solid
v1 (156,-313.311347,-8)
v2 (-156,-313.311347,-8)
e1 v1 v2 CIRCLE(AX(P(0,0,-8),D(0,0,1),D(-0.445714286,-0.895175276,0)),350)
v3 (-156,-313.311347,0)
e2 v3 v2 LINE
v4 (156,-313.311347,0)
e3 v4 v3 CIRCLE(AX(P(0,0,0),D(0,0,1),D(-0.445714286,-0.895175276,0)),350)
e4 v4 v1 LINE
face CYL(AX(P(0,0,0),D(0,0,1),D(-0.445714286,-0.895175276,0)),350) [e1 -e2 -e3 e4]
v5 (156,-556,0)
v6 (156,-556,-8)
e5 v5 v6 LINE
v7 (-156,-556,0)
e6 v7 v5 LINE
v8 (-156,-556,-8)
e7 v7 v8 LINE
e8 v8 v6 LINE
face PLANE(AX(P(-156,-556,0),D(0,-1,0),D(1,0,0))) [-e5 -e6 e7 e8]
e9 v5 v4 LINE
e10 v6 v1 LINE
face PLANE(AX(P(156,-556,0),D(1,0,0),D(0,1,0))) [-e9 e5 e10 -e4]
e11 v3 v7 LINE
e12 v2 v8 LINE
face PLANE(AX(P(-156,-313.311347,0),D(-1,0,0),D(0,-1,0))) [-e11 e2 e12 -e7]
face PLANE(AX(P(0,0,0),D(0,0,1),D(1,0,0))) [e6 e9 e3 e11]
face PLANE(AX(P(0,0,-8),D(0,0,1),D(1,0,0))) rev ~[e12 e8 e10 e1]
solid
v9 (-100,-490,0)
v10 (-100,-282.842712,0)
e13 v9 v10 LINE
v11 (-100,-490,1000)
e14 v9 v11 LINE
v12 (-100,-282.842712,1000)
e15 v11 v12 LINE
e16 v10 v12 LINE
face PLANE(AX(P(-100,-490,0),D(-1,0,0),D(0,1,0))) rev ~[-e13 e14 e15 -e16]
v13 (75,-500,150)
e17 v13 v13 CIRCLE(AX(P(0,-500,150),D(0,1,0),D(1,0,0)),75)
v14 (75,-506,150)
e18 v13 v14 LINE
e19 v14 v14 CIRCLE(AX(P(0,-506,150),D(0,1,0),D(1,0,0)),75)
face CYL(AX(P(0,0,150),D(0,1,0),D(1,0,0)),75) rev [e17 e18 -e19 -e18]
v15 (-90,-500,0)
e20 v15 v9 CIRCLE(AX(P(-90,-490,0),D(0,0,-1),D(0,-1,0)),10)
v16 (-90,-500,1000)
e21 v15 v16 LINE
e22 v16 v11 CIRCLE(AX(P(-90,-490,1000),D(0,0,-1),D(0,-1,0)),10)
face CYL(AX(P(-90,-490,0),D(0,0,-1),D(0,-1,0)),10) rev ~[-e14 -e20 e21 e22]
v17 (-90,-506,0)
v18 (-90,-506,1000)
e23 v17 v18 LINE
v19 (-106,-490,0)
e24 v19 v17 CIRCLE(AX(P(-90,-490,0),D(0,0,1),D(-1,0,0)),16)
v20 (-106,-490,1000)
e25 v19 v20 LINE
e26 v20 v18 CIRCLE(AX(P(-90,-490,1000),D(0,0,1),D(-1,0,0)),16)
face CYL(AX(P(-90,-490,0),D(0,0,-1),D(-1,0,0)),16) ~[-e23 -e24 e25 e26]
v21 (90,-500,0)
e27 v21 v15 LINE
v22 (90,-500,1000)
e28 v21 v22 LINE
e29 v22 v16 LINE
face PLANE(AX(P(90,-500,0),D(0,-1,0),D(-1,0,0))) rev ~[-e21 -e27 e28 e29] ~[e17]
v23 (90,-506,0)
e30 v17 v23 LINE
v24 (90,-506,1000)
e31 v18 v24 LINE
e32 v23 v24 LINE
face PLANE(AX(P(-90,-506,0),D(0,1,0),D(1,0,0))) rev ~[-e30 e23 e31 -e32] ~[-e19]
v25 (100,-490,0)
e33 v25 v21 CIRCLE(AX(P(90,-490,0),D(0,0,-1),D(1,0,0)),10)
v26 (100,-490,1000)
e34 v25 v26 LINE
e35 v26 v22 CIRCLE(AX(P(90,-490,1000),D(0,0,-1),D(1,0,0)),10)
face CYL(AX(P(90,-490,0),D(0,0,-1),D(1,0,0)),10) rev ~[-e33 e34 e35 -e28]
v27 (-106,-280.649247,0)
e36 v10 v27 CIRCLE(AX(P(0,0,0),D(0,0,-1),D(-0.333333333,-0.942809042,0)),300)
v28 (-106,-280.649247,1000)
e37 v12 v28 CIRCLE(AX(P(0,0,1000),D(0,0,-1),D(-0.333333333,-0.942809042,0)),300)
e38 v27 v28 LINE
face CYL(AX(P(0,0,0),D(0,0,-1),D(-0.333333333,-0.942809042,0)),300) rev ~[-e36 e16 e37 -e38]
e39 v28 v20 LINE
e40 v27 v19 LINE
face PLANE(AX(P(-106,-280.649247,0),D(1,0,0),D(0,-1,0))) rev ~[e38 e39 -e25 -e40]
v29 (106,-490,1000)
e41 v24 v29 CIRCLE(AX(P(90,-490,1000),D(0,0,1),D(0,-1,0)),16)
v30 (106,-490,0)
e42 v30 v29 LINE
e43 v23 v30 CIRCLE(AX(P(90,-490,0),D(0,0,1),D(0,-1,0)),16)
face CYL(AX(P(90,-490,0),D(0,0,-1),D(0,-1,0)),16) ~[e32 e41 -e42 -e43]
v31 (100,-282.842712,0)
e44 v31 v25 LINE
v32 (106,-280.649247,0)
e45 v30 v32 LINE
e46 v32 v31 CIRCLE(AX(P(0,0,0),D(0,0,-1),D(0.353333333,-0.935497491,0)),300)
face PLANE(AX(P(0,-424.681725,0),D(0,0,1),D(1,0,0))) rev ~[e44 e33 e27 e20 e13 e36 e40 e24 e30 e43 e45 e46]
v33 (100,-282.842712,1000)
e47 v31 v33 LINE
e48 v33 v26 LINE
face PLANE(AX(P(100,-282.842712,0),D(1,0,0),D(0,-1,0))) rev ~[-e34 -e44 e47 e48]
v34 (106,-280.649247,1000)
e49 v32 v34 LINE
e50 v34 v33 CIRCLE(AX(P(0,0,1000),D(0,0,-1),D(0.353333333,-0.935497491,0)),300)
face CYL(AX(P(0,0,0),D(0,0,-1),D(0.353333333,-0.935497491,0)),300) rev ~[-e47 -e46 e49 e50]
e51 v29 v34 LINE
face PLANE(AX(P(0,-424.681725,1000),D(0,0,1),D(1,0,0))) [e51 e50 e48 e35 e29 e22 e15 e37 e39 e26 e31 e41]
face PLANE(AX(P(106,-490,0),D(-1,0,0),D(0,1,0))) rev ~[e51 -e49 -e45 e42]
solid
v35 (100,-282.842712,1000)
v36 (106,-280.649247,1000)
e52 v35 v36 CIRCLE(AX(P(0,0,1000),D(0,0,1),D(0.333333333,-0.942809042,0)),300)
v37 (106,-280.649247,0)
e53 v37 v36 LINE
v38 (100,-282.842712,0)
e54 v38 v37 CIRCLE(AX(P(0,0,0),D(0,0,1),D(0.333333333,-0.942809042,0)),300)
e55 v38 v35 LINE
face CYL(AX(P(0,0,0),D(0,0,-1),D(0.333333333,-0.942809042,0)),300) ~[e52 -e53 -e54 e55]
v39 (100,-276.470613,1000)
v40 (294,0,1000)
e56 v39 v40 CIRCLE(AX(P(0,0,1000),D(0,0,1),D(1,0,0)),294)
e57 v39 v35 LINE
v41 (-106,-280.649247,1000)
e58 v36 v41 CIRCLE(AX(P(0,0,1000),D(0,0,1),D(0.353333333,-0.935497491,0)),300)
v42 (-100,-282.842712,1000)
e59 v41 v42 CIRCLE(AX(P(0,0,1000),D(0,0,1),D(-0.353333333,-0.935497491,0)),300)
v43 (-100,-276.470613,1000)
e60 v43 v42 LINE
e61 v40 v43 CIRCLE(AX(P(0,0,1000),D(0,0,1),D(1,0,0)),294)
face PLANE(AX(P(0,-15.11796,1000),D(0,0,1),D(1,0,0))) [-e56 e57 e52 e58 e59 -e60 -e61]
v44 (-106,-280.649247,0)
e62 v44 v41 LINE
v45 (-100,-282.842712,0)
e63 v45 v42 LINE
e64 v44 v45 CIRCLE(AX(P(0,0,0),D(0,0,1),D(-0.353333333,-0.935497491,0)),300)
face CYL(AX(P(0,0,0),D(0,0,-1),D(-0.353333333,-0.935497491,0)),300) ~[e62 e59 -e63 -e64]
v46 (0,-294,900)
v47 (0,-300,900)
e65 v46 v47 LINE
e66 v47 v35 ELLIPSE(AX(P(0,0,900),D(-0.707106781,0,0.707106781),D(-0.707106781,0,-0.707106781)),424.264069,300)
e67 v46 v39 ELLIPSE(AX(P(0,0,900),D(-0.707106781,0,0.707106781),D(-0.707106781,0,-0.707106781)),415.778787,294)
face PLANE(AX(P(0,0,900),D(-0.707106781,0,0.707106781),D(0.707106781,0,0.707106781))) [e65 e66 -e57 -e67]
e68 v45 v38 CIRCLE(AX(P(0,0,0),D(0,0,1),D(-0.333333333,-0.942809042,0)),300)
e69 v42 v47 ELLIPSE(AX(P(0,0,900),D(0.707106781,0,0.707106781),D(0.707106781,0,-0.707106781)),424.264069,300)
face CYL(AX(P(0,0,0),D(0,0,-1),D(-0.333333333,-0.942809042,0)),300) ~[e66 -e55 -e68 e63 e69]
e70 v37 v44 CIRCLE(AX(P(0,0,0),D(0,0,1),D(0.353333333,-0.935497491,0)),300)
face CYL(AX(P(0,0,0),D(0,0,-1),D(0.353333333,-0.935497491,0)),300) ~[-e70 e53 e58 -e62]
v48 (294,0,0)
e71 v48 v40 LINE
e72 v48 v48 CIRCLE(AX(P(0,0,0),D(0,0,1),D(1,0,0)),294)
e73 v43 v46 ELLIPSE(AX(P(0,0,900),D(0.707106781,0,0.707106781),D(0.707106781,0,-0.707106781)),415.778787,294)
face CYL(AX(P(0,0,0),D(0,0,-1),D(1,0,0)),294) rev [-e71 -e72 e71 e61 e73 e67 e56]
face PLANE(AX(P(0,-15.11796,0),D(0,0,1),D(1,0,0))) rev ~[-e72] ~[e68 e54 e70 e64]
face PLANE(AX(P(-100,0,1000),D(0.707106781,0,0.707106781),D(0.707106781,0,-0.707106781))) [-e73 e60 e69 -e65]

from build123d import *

# Parameters (mm, degrees)
F0_R     = 294
F1_DEPTH = 1000
F3_DEPTH = 300.001
F4_DEPTH = 1000
F2_R     = 75
F5_DEPTH = 506.001
F6_R     = 294
F7_DEPTH = 8


with BuildPart() as f1:
    # F0 (on Top) → F1 (new body)
    with BuildSketch(Plane.XY):
        with BuildLine():
            ThreePointArc((106, -280.6492472821), (246.7792535851, -170.5872210923), (300, 0))
            ThreePointArc((300, 0), (-170.5872210923, 246.7792535851), (-106, -280.6492472821))
            ThreePointArc((-106, -280.6492472821), (-103.0058387781, -281.7619512596), (-100, -282.8427124746))
            ThreePointArc((-100, -282.8427124746), (0, -300), (100, -282.8427124746))
            ThreePointArc((100, -282.8427124746), (103.0058387781, -281.7619512596), (106, -280.6492472821))
        make_face()
        Circle(F0_R, mode=Mode.SUBTRACT)
    extrude(amount=F1_DEPTH)

    # F2 (on Front) → F3 (cut, through all)
    with BuildSketch(Plane.XZ):
        Polygon((100, 1000), (-100, 1000), (0, 900), align=None)
    extrude(amount=F3_DEPTH, mode=Mode.SUBTRACT)


with BuildPart() as f4:
    # F0 (on Top) → F4 (new body)
    with BuildSketch(Plane.XY):
        with BuildLine():
            ThreePointArc((-100, -282.8427124746), (-103.0058387781, -281.7619512596), (-106, -280.6492472821))
            Line((-106, -280.6492472821), (-106, -490))
            ThreePointArc((-106, -490), (-101.313708499, -501.313708499), (-90, -506))
            Line((-90, -506), (90, -506))
            ThreePointArc((90, -506), (101.313708499, -501.313708499), (106, -490))
            Line((106, -490), (106, -280.6492472821))
            ThreePointArc((106, -280.6492472821), (103.0058387781, -281.7619512596), (100, -282.8427124746))
            Line((100, -282.8427124746), (100, -490))
            ThreePointArc((100, -490), (97.0710678119, -497.0710678119), (90, -500))
            Line((90, -500), (-90, -500))
            ThreePointArc((-90, -500), (-97.0710678119, -497.0710678119), (-100, -490))
            Line((-100, -490), (-100, -282.8427124746))
        make_face()
    extrude(amount=F4_DEPTH)

    # F2 (on Front) → F5 (cut, through all)
    with BuildSketch(Plane.XZ):
        with Locations((0, 150)):
            Circle(F2_R)
    extrude(amount=F5_DEPTH, mode=Mode.SUBTRACT)


with BuildPart() as f7:
    # F6 (on face) → F7 (new body)
    with BuildSketch(Plane.XY):
        with BuildLine():
            ThreePointArc((156, -313.3113467463), (297.5735203273, -184.2552577269), (350, 0))
            ThreePointArc((350, 0), (-184.2552577269, 297.5735203273), (-156, -313.3113467463))
            ThreePointArc((-156, -313.3113467463), (0, -350), (156, -313.3113467463))
        make_face()
        with BuildLine():
            ThreePointArc((300, 0), (246.7792535851, -170.5872210923), (106, -280.6492472821))
            ThreePointArc((106, -280.6492472821), (103.0058387781, -281.7619512596), (100, -282.8427124746))
            ThreePointArc((100, -282.8427124746), (0, -300), (-100, -282.8427124746))
            ThreePointArc((-100, -282.8427124746), (-103.0058387781, -281.7619512596), (-106, -280.6492472821))
            ThreePointArc((-106, -280.6492472821), (-170.5872210923, 246.7792535851), (300, 0))
        make_face(mode=Mode.SUBTRACT)
        with BuildLine():
            ThreePointArc((100, -282.8427124746), (103.0058387781, -281.7619512596), (106, -280.6492472821))
            ThreePointArc((106, -280.6492472821), (246.7792535851, -170.5872210923), (300, 0))
            ThreePointArc((300, 0), (-170.5872210923, 246.7792535851), (-106, -280.6492472821))
            ThreePointArc((-106, -280.6492472821), (-103.0058387781, -281.7619512596), (-100, -282.8427124746))
            ThreePointArc((-100, -282.8427124746), (0, -300), (100, -282.8427124746))
        make_face()
        Circle(F6_R, mode=Mode.SUBTRACT)
        Circle(F6_R)
        with BuildLine():
            ThreePointArc((156, -313.3113467463), (0, -350), (-156, -313.3113467463))
            Line((-156, -313.3113467463), (-156, -556))
            Line((-156, -556), (156, -556))
            Line((156, -556), (156, -313.3113467463))
        make_face()
    extrude(amount=-F7_DEPTH)


solid = Compound([f1.part, f4.part, f7.part])
